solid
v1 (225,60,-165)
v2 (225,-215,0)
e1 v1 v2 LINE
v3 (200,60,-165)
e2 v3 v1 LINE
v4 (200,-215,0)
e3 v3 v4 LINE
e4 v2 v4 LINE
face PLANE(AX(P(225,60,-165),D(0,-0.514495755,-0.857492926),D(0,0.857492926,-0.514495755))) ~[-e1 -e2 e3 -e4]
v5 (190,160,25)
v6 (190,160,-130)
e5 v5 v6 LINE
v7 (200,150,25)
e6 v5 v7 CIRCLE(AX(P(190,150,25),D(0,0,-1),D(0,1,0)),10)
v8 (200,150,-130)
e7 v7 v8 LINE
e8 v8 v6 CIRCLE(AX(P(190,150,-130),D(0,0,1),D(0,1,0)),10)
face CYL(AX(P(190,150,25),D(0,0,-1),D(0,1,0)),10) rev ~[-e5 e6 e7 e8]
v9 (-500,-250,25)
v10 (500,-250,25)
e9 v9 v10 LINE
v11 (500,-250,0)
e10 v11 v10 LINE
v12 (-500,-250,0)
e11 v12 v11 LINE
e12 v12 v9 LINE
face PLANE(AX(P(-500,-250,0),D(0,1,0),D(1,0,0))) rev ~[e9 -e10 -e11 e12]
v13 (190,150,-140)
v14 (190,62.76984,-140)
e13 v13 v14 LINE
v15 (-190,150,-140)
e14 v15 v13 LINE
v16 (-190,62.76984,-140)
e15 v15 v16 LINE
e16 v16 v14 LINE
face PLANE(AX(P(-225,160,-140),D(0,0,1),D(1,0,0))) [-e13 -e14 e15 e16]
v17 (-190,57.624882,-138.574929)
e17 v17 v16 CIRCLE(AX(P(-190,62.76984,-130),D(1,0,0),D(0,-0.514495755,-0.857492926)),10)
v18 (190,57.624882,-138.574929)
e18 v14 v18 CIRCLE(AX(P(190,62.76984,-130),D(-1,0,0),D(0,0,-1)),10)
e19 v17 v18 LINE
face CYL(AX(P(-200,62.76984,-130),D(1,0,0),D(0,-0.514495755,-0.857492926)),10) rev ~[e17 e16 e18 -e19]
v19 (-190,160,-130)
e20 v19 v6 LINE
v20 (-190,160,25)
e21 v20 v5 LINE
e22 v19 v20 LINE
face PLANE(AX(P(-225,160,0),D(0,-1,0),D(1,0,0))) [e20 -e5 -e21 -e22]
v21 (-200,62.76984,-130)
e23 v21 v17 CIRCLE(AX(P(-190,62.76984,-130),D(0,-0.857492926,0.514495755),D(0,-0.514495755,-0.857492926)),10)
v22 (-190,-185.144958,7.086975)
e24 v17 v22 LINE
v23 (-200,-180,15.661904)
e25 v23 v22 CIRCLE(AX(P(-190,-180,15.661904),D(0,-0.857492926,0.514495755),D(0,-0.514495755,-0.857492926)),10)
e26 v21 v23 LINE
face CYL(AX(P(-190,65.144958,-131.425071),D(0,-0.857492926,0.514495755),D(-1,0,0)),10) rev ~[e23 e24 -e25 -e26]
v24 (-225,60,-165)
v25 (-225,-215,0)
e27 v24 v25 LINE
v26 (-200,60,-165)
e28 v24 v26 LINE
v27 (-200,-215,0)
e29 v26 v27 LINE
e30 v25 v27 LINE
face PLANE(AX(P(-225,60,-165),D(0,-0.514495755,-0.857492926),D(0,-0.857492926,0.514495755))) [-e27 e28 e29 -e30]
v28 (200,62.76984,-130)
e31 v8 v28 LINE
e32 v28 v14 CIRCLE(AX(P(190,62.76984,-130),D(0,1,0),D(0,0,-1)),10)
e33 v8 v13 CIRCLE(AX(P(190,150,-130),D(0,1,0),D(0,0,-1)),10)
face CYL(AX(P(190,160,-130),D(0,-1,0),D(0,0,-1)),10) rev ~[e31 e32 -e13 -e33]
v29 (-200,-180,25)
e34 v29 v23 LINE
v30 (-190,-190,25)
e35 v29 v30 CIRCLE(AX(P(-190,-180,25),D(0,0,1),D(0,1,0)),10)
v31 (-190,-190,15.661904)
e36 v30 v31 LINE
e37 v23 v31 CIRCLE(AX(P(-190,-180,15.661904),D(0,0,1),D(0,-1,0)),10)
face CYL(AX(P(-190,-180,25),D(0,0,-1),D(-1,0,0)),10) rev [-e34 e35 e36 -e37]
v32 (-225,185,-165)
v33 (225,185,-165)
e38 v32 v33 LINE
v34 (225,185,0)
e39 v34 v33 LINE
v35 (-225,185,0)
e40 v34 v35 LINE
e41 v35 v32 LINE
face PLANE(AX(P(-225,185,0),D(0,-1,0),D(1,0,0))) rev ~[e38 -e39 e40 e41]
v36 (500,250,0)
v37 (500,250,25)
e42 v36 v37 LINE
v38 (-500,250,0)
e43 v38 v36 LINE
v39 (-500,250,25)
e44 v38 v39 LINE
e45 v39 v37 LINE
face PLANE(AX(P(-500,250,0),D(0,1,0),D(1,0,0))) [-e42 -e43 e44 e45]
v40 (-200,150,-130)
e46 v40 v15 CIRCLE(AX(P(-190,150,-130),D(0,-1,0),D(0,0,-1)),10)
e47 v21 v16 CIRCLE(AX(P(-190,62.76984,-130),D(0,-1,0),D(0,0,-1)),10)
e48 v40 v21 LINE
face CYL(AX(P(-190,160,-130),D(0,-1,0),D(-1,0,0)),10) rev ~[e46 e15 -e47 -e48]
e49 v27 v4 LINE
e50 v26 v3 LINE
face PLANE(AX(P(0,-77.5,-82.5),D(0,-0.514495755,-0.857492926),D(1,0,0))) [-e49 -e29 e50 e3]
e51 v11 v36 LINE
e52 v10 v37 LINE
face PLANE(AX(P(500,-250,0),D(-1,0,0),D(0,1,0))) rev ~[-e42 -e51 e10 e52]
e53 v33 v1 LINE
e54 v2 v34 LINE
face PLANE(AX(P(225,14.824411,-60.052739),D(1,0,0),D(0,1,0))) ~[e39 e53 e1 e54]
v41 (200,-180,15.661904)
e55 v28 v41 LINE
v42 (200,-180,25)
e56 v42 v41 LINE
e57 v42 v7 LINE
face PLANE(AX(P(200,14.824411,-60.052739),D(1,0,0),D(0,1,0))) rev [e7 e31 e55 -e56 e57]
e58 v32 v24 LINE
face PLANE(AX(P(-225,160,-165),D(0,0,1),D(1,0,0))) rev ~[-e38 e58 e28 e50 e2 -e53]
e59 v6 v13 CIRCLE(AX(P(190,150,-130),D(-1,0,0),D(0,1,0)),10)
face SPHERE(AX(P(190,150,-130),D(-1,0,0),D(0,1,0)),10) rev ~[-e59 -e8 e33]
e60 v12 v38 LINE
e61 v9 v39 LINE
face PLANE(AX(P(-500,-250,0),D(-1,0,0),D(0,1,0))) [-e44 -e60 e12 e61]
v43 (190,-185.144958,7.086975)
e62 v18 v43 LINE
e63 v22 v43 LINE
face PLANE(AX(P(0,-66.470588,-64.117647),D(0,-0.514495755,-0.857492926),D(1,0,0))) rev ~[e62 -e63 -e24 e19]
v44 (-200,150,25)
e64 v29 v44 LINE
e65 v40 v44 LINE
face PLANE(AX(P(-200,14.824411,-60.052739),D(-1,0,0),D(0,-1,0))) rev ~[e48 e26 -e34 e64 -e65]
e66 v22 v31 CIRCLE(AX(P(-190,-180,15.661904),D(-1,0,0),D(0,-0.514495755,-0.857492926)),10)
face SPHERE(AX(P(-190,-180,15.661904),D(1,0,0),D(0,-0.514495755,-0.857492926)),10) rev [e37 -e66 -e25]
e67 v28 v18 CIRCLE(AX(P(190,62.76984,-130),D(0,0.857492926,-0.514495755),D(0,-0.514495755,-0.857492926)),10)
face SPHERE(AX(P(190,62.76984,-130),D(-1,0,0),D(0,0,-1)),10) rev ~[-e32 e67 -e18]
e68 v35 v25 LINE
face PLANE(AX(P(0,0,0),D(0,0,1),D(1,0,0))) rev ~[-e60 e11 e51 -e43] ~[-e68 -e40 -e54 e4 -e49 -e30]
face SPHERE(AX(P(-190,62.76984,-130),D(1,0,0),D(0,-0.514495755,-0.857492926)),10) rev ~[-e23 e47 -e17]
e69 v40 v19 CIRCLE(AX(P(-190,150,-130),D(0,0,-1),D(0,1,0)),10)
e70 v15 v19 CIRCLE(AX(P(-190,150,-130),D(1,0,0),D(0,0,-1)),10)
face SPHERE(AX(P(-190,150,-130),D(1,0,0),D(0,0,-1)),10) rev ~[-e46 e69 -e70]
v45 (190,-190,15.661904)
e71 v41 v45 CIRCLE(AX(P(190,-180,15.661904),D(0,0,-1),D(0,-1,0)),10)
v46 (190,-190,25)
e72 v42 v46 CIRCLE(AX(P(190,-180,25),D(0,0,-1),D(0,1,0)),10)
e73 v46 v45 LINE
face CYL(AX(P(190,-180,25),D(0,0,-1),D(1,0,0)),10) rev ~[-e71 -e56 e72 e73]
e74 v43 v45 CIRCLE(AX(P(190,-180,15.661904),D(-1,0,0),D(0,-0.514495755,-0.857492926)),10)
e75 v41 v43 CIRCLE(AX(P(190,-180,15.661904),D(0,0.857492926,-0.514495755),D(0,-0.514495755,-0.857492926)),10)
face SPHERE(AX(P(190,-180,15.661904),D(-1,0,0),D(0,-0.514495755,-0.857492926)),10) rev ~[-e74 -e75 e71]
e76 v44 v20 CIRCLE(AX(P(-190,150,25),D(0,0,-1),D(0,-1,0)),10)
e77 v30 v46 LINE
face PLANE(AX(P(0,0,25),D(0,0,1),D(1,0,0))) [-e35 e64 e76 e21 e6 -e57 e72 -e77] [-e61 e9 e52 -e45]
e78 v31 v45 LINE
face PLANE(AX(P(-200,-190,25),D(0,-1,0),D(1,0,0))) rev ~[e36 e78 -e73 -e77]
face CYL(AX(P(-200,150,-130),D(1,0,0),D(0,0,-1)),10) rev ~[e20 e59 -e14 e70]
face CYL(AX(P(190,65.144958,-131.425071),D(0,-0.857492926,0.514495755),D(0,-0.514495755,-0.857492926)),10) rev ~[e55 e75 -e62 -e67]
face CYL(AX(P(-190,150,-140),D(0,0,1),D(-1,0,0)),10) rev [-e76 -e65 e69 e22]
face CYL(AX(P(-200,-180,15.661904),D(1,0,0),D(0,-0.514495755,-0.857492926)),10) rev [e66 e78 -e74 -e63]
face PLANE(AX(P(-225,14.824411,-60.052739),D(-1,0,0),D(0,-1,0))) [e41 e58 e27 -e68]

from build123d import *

# Parameters (mm, degrees)
F0_W      = 1000
F0_H      = 500
F1_DEPTH  = 25
F2_W      = 400
F2_H      = 350
F3_DEPTH  = 25
F4_W      = 450
F4_H      = 25
F5_DEPTH  = 165
F6_W      = 450
F6_H      = 25
F7_DEPTH  = 100
F9_DEPTH  = 25
F10_W     = 450
F10_H     = 320.7023542165
F11_DEPTH = 21.4373231428
F12_R     = 10


# Not quite as in the source:
# - a pattern or mirror of a feature is missing from the dataset's text; its kind, count and spacing are read off the source's solid


with BuildPart() as f1:
    # F0 (on Top) → F1 (new body)
    with BuildSketch(Plane.XY):
        Rectangle(F0_W, F0_H)
    extrude(amount=F1_DEPTH)

    # F2 (on face) → F3 (cut, through all)
    with BuildSketch(Plane.XY.offset(25)):
        with Locations((0, -15)):
            Rectangle(F2_W, F2_H)
    extrude(amount=-F3_DEPTH, mode=Mode.SUBTRACT)

    # F4 (on face) → F5 (join)
    with BuildSketch(Plane(origin=(0, 0, 0), x_dir=(1, 0, 0), z_dir=(0, 0, -1))):
        with Locations((0, -172.5)):
            Rectangle(F4_W, F4_H)
    extrude(amount=F5_DEPTH)

    # F6 (on face) → F7 (join)
    with BuildSketch(Plane.XZ.offset(-160)):
        with Locations((0, -152.5)):
            Rectangle(F6_W, F6_H)
    extrude(amount=F7_DEPTH)

    # F8 (on face) → F9 (join)
    with BuildSketch(Plane(origin=(-225, 0, 0), x_dir=(0, -1, 0), z_dir=(-1, 0, 0))):
        Polygon((215, 0), (-185, 0), (-185, -165), (-60, -165), align=None)
    f9 = extrude(amount=-F9_DEPTH)

    # F9_copies: F9 across plane
    add(f9.mirror(Plane(origin=(0, 0, 0), x_dir=(0, 0, 1), z_dir=(1, 0, 0))))

    # F10 (on face) → F11 (join, through all)
    with BuildSketch(Plane(origin=(0, -56.9117647059, -94.8529411765), x_dir=(1, 0, 0), z_dir=(0, -0.5144957554, -0.8574929257))):
        with Locations((0, 24.00980192)):
            Rectangle(F10_W, F10_H)
    extrude(amount=-F11_DEPTH)

    # F12
    f12_edges = [f1.edges().sort_by_distance(p)[0] for p in [
        (0, 160, -140),
        (-200, 110, -140),
        (-200, 160, -57.5),
        (0, 60, -140),
        (-200, -65, -65),
        (-200, -190, 17.5),
        (200, -190, 17.5),
        (0, -190, 10),
        (200, 160, -57.5),
        (200, 110, -140),
        (200, -65, -65),
    ]]
    fillet(f12_edges, radius=F12_R)


solid = f1.part
